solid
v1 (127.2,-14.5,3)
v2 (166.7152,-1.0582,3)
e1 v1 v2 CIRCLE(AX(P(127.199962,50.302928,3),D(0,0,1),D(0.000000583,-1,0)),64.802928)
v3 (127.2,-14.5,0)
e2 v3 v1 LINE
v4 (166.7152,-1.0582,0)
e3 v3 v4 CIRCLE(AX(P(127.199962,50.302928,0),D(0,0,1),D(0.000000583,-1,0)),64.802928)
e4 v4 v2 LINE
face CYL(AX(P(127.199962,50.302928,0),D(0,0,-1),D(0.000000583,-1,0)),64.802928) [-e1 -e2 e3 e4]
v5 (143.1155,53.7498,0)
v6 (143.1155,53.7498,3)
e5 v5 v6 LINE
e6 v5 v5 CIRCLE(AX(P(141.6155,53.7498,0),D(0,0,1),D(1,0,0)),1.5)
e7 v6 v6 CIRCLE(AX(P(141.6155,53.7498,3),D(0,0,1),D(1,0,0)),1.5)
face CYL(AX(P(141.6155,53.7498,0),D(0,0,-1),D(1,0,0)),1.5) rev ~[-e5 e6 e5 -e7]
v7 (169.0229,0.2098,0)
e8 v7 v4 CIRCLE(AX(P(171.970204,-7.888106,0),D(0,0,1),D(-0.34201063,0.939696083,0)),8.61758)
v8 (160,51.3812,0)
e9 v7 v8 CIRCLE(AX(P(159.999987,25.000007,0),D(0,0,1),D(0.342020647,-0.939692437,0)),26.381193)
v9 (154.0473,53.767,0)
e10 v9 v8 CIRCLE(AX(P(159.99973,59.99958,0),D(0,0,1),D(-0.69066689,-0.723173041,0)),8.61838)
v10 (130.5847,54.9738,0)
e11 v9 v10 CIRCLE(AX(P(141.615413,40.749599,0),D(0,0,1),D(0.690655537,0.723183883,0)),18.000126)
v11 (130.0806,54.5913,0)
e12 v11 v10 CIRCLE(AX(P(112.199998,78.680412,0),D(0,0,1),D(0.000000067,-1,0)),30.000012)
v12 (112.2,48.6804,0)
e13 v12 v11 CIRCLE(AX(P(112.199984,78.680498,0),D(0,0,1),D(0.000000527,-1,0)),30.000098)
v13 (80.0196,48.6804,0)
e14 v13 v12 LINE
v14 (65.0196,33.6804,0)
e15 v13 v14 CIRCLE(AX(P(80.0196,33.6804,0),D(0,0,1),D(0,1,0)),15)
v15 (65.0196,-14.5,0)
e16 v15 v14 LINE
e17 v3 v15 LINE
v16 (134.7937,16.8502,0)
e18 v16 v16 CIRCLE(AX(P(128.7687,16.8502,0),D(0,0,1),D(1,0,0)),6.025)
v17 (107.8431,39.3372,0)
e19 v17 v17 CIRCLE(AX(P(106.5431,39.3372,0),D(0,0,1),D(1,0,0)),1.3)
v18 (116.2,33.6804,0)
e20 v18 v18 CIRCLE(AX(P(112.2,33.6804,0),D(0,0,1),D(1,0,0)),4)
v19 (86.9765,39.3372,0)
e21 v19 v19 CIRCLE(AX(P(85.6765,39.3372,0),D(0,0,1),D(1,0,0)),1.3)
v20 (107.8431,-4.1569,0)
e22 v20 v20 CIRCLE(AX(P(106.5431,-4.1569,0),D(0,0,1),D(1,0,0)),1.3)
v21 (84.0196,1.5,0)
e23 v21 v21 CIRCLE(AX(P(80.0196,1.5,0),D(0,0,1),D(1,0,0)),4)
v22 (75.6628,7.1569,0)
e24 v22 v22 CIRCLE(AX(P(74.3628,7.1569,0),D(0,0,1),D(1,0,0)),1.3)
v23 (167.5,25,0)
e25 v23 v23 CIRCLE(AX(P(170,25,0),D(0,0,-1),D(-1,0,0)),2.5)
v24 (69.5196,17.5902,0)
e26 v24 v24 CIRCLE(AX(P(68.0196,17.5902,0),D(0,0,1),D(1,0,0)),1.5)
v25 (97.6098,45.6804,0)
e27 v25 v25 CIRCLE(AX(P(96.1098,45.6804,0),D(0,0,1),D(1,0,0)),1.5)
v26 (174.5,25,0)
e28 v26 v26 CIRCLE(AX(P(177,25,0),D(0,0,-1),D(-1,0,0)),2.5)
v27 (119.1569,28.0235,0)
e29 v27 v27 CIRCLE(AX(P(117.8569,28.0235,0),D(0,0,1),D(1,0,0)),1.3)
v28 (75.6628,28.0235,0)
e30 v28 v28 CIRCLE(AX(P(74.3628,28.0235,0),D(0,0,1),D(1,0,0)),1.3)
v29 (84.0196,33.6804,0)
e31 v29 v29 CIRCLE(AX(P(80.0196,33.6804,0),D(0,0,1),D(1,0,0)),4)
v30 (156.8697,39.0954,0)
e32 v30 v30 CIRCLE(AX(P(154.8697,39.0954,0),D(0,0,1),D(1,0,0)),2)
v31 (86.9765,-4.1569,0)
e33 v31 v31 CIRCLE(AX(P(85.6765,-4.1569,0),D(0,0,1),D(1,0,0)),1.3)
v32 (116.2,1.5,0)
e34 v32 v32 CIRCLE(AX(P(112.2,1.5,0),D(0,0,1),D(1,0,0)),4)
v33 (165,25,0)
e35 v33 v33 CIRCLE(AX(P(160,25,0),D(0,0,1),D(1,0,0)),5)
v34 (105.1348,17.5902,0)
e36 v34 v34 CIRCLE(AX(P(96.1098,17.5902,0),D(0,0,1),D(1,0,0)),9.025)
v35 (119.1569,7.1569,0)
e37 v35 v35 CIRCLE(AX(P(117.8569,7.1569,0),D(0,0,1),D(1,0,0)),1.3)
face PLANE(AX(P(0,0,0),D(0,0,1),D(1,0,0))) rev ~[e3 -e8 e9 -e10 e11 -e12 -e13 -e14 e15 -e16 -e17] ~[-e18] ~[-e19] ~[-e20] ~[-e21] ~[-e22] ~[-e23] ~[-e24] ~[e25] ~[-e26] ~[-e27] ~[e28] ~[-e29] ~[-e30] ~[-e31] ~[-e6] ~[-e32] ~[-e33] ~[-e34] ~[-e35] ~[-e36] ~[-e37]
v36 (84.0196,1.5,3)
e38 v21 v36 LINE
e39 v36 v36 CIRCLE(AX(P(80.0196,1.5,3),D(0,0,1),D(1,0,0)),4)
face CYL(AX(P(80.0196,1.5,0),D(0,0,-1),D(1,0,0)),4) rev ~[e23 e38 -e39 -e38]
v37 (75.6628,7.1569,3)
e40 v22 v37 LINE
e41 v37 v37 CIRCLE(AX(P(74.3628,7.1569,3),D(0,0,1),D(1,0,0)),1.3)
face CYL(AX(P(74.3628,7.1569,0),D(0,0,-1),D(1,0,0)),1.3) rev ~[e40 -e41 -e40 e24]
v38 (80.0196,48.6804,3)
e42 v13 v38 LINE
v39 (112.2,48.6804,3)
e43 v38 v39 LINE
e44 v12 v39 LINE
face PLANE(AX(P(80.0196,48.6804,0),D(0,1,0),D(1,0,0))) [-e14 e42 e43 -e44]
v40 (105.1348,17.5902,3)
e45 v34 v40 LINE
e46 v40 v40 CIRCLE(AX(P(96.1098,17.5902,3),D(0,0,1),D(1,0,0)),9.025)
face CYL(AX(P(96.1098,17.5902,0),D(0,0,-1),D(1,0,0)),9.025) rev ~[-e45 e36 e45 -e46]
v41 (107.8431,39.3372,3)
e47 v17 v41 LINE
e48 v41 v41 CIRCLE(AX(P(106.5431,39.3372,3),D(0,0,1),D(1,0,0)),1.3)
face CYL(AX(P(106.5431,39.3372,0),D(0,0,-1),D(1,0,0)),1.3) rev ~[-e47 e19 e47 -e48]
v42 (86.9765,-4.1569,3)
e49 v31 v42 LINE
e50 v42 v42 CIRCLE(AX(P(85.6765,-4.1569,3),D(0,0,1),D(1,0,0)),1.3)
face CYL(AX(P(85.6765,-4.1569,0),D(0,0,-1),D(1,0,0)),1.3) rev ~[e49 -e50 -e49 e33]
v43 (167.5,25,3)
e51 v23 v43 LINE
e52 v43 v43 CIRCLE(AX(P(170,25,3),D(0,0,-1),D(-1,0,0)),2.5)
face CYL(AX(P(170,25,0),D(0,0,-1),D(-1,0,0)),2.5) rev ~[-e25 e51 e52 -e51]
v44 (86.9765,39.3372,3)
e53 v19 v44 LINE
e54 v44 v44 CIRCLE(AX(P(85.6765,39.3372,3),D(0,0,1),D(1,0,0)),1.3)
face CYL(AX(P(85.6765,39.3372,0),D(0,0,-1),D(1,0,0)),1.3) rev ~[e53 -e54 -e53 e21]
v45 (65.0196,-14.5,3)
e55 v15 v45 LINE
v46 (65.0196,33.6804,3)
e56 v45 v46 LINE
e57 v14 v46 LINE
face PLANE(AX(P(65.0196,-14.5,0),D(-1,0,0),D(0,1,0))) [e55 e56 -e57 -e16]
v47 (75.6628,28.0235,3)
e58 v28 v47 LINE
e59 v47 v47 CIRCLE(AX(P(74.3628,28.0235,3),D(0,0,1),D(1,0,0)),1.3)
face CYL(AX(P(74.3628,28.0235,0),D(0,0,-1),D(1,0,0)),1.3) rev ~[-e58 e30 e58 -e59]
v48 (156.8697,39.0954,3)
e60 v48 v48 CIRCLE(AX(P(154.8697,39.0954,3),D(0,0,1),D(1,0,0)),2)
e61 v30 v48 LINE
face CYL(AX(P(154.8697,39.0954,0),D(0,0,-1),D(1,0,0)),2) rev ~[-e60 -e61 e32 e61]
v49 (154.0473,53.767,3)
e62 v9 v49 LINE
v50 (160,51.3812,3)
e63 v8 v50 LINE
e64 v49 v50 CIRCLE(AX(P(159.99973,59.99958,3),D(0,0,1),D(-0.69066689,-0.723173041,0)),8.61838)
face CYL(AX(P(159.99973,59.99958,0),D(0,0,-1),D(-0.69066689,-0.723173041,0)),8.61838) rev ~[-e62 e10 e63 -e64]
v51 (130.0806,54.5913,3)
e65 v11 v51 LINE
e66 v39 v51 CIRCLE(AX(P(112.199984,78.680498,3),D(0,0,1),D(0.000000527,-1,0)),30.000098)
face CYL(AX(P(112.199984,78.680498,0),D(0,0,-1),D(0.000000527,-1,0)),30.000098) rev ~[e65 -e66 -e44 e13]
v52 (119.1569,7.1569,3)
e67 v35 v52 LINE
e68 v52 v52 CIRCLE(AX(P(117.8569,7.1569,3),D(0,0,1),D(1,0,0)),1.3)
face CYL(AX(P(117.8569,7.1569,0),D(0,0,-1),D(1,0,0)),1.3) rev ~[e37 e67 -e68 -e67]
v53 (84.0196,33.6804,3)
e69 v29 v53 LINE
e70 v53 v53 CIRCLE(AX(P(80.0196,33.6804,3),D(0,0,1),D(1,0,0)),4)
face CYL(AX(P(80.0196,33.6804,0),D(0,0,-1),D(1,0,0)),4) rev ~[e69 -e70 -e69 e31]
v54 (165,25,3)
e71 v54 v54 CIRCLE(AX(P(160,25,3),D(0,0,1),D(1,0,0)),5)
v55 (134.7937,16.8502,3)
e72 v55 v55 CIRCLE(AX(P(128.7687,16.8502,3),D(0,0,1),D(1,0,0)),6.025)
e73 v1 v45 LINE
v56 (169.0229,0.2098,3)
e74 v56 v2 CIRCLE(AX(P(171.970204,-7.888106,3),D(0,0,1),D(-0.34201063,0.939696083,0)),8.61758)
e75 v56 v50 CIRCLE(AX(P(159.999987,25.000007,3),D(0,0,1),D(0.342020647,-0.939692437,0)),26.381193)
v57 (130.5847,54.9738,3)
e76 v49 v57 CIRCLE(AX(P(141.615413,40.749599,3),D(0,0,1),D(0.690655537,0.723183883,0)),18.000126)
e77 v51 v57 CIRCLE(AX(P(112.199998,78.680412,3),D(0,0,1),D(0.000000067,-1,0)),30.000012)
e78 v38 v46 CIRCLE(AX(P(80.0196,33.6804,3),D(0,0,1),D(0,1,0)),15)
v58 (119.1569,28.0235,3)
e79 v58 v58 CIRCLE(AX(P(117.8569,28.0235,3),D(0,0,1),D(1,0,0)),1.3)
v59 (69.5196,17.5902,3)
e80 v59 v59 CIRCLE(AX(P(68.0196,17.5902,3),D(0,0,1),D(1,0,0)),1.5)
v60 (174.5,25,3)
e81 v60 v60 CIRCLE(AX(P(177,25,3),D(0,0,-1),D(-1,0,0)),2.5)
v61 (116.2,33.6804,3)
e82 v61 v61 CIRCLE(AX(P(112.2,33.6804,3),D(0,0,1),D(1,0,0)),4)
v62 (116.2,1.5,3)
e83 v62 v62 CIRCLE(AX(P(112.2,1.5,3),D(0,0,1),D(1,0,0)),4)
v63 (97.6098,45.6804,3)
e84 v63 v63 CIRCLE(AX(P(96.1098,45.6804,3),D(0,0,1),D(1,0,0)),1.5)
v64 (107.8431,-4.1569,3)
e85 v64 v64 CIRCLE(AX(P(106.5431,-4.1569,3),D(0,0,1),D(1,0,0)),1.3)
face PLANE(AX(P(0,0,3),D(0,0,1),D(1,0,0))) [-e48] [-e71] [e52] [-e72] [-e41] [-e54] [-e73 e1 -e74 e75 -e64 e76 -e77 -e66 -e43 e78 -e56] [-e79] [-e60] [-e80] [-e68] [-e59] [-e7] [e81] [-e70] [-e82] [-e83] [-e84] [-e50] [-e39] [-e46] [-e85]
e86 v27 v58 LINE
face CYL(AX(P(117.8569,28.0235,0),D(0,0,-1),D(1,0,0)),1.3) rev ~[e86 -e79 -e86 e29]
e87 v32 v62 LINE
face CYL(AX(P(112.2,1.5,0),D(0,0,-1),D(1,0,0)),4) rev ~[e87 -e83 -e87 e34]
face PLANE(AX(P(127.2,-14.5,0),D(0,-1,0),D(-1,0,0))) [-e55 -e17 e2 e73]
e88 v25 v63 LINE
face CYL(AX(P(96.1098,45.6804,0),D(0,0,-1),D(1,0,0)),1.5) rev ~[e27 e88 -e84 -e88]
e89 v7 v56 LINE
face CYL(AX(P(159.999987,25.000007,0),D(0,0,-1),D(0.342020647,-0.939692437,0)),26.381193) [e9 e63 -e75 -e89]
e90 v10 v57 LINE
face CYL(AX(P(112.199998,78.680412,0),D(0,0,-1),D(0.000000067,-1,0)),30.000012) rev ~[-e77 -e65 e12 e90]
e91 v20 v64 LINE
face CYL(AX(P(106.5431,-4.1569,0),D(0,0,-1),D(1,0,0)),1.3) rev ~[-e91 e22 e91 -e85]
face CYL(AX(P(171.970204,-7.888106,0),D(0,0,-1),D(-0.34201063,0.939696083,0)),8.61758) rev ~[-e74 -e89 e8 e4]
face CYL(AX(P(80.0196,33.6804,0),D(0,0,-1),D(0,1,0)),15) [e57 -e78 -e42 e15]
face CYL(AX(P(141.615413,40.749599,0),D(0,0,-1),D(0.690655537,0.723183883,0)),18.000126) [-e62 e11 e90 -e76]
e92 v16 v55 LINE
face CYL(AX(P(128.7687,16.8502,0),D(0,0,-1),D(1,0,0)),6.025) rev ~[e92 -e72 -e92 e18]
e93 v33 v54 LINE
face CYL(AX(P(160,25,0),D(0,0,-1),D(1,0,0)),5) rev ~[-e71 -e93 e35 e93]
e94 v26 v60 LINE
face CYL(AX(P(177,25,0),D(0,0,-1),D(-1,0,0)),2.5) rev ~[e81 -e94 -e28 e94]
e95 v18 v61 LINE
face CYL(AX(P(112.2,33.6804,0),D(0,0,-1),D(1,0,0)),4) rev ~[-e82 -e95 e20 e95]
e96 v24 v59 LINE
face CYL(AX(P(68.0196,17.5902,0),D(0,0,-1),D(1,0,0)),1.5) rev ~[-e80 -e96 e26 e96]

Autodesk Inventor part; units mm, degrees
ref_plane "YZ Plane" through (0, 0, 0) normal (1, 0, 0) x (0, 1, 0)
ref_plane "XZ Plane" through (0, 0, 0) normal (0, 1, 0) x (-1, 0, 0)
ref_plane "XY Plane" through (0, 0, 0) normal (0, 0, 1) x (1, 0, 0)
sketch "スケッチ1" plane through (0, 0, 0) normal (0, 0, 1) x (1, 0, 0)
  line L0 (65.0196, -14.5) -> (65.0196, 33.6804)
  circle A0 centre (80.0196, 33.6804) radius 15 construction
  line L1 (80.0196, 48.6804) -> (112.2, 48.6804)
  circle A1 centre (112.2, 33.6804) radius 15 construction
  line L2 (127.2, -14.5) -> (65.0196, -14.5)
  circle A2 centre (80.0196, 33.6804) radius 3.05 construction
  circle A3 centre (112.2, 33.6804) radius 3.05 construction
  circle A4 centre (112.2, 1.5) radius 3.05 construction
  circle A5 centre (80.0196, 1.5) radius 3.05 construction
  circle A6 centre (96.1098, 17.5902) radius 2.85 construction
  circle A7 centre (128.7687, 16.8502) radius 5.7 construction
  circle A8 centre (160, 25) radius 21.5 construction
  circle A9 centre (128.7687, 16.8502) radius 28.5 construction
  circle A10 centre (128.7687, 16.8502) radius 29.4672 construction
  circle A11 centre (160, 25) radius 25.8772 construction
  circle A12 centre (80.0196, 33.6804) radius 4
  circle A13 centre (112.2, 33.6804) radius 4
  circle A14 centre (80.0196, 1.5) radius 4
  circle A15 centre (112.2, 1.5) radius 4
  arc A16 (112.2, 48.6804) -> (130.0806, 54.5913) centre (112.2, 78.6804) ccw
  arc A17 (153.3164, 53.0826) -> (160, 50.3812) centre (160, 60) ccw
  arc A18 (153.3164, 53.0826) -> (130.0806, 54.5913) centre (140.809, 40.1379) ccw
  circle A19 centre (96.1098, 17.5902) radius 9.025
  circle A20 centre (128.7687, 16.8502) radius 6.025
  circle A21 centre (160, 25) radius 5
  arc A22 (168.6809, 1.1495) -> (160, 50.3812) centre (160, 25) ccw
  arc A23 (168.6809, 1.1495) -> (165.807, -0.5048) centre (171.9707, -7.8892) ccw
  circle A24 centre (171.9707, -7.8892) radius 8.6188 construction
  arc A25 (127.2, -14.5) -> (165.807, -0.5048) centre (127.2, 45.748) ccw
  circle A26 centre (160, 60) radius 8.6188 construction
  circle A27 centre (154.8697, 39.0954) radius 3 construction
  circle A28 centre (154.8697, 39.0954) radius 2
  arc A29 (157.2213, 29.1568) -> (99.1742, 26.079) centre (128.7687, 16.8502) ccw construction
  arc A30 (98.7866, 8.9713) -> (159.6067, 20.0155) centre (128.7687, 16.8502) ccw construction
  arc A31 (80.0196, 48.6804) -> (65.0196, 33.6804) centre (80.0196, 33.6804) ccw
  circle A32 centre (68.0196, 17.5902) radius 1.5
  circle A33 centre (96.1098, 45.6804) radius 1.5
  circle A34 centre (74.3628, 28.0235) radius 1.3
  circle A35 centre (85.6765, 39.3372) radius 1.3
  circle A36 centre (106.5431, 39.3372) radius 1.3
  circle A37 centre (117.8569, 28.0235) radius 1.3
  circle A38 centre (117.8569, 7.1569) radius 1.3
  circle A39 centre (106.5431, -4.1569) radius 1.3
  circle A40 centre (85.6765, -4.1569) radius 1.3
  circle A41 centre (74.3628, 7.1569) radius 1.3
  line L3 (74.3628, 28.0235) -> (85.6765, 39.3372) construction
  line L4 (65.0196, -14.5) -> (65.0196, 33.6804)
  circle A42 centre (80.0196, 33.6804) radius 15 construction
  line L5 (80.0196, 48.6804) -> (112.2, 48.6804)
  circle A43 centre (112.2, 33.6804) radius 15 construction
  line L6 (127.2, -14.5) -> (65.0196, -14.5)
  circle A44 centre (80.0196, 33.6804) radius 3.05 construction
  circle A45 centre (112.2, 33.6804) radius 3.05 construction
  circle A46 centre (112.2, 1.5) radius 3.05 construction
  circle A47 centre (80.0196, 1.5) radius 3.05 construction
  circle A48 centre (96.1098, 17.5902) radius 2.85 construction
  circle A49 centre (128.7687, 16.8502) radius 5.7 construction
  circle A50 centre (160, 25) radius 21.5 construction
  circle A51 centre (128.7687, 16.8502) radius 28.5 construction
  circle A52 centre (128.7687, 16.8502) radius 29.4672 construction
  circle A53 centre (160, 25) radius 25.8772 construction
  circle A54 centre (80.0196, 33.6804) radius 6
  circle A55 centre (112.2, 33.6804) radius 6
  circle A56 centre (80.0196, 1.5) radius 6
  circle A57 centre (112.2, 1.5) radius 6
  arc A58 (112.2, 48.6804) -> (130.5847, 54.9738) centre (112.2, 78.6804) ccw
  arc A59 (154.0473, 53.767) -> (160, 51.3812) centre (160, 60) ccw
  arc A60 (154.0473, 53.767) -> (130.5847, 54.9738) centre (141.6155, 40.7498) ccw
  circle A61 centre (96.1098, 17.5902) radius 9.025
  circle A62 centre (128.7687, 16.8502) radius 6.025
  circle A63 centre (160, 25) radius 2
  arc A64 (169.0229, 0.2098) -> (160, 51.3812) centre (160, 25) ccw
  arc A65 (169.0229, 0.2098) -> (166.7152, -1.0582) centre (171.9707, -7.8892) ccw
  circle A66 centre (171.9707, -7.8892) radius 8.6188 construction
  arc A67 (127.2, -14.5) -> (166.7152, -1.0582) centre (127.2, 50.3027) ccw
  circle A68 centre (160, 60) radius 8.6188 construction
  circle A69 centre (154.8697, 39.0954) radius 3 construction
  circle A70 centre (154.8697, 39.0954) radius 2
  arc A71 (158.348, 26.1273) -> (99.1742, 26.079) centre (128.7687, 16.8502) ccw construction
  arc A72 (98.7866, 8.9713) -> (159.1094, 23.2092) centre (128.7687, 16.8502) ccw construction
  arc A73 (80.0196, 48.6804) -> (65.0196, 33.6804) centre (80.0196, 33.6804) ccw
  circle A74 centre (141.6155, 53.7498) radius 5 construction
  circle A75 centre (141.6155, 53.7498) radius 4
  circle A76 centre (141.6155, 53.7498) radius 1.5
  point P0 (0, 0)
  point P1 (0, 0)
  point P2 (96.1924, 17.5902)
  point P3 (80.1022, 1.5)
  point P4 (112.2826, 1.5)
  point P5 (112.2826, 33.6804)
  point P6 (80.1962, 33.857)
  point P7 (160, 60)
  point P8 (0, 0)
  point P9 (96.1924, 17.5902)
  point P10 (80.1022, 1.5)
  point P11 (112.2826, 1.5)
  point P12 (112.2826, 33.6804)
  point P13 (80.1022, 33.6804)
  point P14 (160, 60)
  point P15 (148.0694, -11.0476)
  point P16 (129.8149, 10.9168)
  point P17 (127.7224, 22.7837)
  point P18 (97.677, 8.7023)
  point P19 (94.5426, 26.4781)
  dimension "d0" = 8
  dimension "d1" = 30
  dimension "d2" = 18.05
  dimension "d3" = 12.05
  dimension "d4" = 10
  dimension "d5" = 1
  dimension "d6" = 18
  dimension "d7" = 4
  dimension "d8" = 31
  dimension "d9" = 32.2772
  dimension "d10" = 60.248
  dimension "d13" = 3
  dimension "d14" = 3
  dimension "d15" = 2.6
  dimension "d16" = 16
  dimension "d25" = 12
  dimension "d26" = 30
  dimension "d27" = 18.05
  dimension "d28" = 12.05
  dimension "d29" = 4
  dimension "d30" = 0
  dimension "d31" = 18
  dimension "d32" = 4
  dimension "d33" = 31
  dimension "d34" = 64.8027
  dimension "d35" = 10
  dimension "d36" = 8
  dimension "d37" = 3
extrude "押し出し1" add sketch "スケッチ1" along normal blind 3 contours L0 A31 L1 A16 A18 A17 A22 A23 A25 L2 | A25 A23 A22 A17 A18 A58 A60 A59 A64 A65 A67 | A54 | A55 | A56 | A57 | A75
sketch "スケッチ2" plane through (0, 0, 0) normal (0, 0, -1) x (-1, 0, 0)
  line L0 (-65.0196, -14.5) -> (-127.2, -14.5) projected
  line L1 (-65.0196, 33.6804) -> (-65.0196, -14.5) projected
  arc A0 (-65.0196, 33.6804) -> (-80.0196, 48.6804) centre (-80.0196, 33.6804) ccw projected
  line L2 (-112.2, 48.6804) -> (-80.0196, 48.6804) projected
  circle A1 centre (-74.3628, 7.1569) radius 1.3 projected
  circle A2 centre (-106.5431, -4.1569) radius 1.3 projected
  circle A3 centre (-117.8569, 28.0235) radius 1.3 projected
  circle A4 centre (-74.3628, 28.0235) radius 1.3 projected
  circle A5 centre (-68.0196, 17.5902) radius 1.5 projected
  circle A6 centre (-96.1098, 45.6804) radius 1.5 projected
  circle A7 centre (-154.8697, 39.0954) radius 2 projected
  circle A8 centre (-128.7687, 16.8502) radius 6.025 projected
  circle A9 centre (-96.1098, 17.5902) radius 9.025 projected
  circle A10 centre (-112.2, 1.5) radius 4 projected
  circle A11 centre (-80.0196, 1.5) radius 4 projected
  circle A12 centre (-112.2, 33.6804) radius 4 projected
  circle A13 centre (-85.6765, 39.3372) radius 1.3 projected
  circle A14 centre (-106.5431, 39.3372) radius 1.3 projected
  circle A15 centre (-117.8569, 7.1569) radius 1.3 projected
  circle A16 centre (-85.6765, -4.1569) radius 1.3 projected
  circle A17 centre (-160, 25) radius 5 projected
  circle A18 centre (-80.0196, 33.6804) radius 4 projected
  circle A19 centre (-170, 25) radius 2.5
  circle A20 centre (-177, 25) radius 2.5
  line L3 (-160, 25) -> (-180.4045, 25) construction
  arc A21 (-166.7152, -1.0582) -> (-127.2, -14.5) centre (-127.2, 50.3027) ccw projected
  arc A22 (-130.5847, 54.9738) -> (-154.0473, 53.767) centre (-141.6155, 40.7498) ccw projected
  arc A23 (-160, 51.3812) -> (-154.0473, 53.767) centre (-160, 60) ccw projected
  arc A24 (-160, 51.3812) -> (-169.0229, 0.2098) centre (-160, 25) ccw projected
  arc A25 (-166.7152, -1.0582) -> (-169.0229, 0.2098) centre (-171.9707, -7.8892) ccw projected
  arc A26 (-130.5847, 54.9738) -> (-112.2, 48.6804) centre (-112.2, 78.6804) ccw projected
  point P0 (0, 0)
  dimension "d20" = 10
  dimension "d21" = 7
  dimension "d22" = 5
extrude "押し出し2" cut sketch "スケッチ2" against normal blind 10 contours A19 | A20
properties part number "中間フレーム" material "アルミニウム 7075"
